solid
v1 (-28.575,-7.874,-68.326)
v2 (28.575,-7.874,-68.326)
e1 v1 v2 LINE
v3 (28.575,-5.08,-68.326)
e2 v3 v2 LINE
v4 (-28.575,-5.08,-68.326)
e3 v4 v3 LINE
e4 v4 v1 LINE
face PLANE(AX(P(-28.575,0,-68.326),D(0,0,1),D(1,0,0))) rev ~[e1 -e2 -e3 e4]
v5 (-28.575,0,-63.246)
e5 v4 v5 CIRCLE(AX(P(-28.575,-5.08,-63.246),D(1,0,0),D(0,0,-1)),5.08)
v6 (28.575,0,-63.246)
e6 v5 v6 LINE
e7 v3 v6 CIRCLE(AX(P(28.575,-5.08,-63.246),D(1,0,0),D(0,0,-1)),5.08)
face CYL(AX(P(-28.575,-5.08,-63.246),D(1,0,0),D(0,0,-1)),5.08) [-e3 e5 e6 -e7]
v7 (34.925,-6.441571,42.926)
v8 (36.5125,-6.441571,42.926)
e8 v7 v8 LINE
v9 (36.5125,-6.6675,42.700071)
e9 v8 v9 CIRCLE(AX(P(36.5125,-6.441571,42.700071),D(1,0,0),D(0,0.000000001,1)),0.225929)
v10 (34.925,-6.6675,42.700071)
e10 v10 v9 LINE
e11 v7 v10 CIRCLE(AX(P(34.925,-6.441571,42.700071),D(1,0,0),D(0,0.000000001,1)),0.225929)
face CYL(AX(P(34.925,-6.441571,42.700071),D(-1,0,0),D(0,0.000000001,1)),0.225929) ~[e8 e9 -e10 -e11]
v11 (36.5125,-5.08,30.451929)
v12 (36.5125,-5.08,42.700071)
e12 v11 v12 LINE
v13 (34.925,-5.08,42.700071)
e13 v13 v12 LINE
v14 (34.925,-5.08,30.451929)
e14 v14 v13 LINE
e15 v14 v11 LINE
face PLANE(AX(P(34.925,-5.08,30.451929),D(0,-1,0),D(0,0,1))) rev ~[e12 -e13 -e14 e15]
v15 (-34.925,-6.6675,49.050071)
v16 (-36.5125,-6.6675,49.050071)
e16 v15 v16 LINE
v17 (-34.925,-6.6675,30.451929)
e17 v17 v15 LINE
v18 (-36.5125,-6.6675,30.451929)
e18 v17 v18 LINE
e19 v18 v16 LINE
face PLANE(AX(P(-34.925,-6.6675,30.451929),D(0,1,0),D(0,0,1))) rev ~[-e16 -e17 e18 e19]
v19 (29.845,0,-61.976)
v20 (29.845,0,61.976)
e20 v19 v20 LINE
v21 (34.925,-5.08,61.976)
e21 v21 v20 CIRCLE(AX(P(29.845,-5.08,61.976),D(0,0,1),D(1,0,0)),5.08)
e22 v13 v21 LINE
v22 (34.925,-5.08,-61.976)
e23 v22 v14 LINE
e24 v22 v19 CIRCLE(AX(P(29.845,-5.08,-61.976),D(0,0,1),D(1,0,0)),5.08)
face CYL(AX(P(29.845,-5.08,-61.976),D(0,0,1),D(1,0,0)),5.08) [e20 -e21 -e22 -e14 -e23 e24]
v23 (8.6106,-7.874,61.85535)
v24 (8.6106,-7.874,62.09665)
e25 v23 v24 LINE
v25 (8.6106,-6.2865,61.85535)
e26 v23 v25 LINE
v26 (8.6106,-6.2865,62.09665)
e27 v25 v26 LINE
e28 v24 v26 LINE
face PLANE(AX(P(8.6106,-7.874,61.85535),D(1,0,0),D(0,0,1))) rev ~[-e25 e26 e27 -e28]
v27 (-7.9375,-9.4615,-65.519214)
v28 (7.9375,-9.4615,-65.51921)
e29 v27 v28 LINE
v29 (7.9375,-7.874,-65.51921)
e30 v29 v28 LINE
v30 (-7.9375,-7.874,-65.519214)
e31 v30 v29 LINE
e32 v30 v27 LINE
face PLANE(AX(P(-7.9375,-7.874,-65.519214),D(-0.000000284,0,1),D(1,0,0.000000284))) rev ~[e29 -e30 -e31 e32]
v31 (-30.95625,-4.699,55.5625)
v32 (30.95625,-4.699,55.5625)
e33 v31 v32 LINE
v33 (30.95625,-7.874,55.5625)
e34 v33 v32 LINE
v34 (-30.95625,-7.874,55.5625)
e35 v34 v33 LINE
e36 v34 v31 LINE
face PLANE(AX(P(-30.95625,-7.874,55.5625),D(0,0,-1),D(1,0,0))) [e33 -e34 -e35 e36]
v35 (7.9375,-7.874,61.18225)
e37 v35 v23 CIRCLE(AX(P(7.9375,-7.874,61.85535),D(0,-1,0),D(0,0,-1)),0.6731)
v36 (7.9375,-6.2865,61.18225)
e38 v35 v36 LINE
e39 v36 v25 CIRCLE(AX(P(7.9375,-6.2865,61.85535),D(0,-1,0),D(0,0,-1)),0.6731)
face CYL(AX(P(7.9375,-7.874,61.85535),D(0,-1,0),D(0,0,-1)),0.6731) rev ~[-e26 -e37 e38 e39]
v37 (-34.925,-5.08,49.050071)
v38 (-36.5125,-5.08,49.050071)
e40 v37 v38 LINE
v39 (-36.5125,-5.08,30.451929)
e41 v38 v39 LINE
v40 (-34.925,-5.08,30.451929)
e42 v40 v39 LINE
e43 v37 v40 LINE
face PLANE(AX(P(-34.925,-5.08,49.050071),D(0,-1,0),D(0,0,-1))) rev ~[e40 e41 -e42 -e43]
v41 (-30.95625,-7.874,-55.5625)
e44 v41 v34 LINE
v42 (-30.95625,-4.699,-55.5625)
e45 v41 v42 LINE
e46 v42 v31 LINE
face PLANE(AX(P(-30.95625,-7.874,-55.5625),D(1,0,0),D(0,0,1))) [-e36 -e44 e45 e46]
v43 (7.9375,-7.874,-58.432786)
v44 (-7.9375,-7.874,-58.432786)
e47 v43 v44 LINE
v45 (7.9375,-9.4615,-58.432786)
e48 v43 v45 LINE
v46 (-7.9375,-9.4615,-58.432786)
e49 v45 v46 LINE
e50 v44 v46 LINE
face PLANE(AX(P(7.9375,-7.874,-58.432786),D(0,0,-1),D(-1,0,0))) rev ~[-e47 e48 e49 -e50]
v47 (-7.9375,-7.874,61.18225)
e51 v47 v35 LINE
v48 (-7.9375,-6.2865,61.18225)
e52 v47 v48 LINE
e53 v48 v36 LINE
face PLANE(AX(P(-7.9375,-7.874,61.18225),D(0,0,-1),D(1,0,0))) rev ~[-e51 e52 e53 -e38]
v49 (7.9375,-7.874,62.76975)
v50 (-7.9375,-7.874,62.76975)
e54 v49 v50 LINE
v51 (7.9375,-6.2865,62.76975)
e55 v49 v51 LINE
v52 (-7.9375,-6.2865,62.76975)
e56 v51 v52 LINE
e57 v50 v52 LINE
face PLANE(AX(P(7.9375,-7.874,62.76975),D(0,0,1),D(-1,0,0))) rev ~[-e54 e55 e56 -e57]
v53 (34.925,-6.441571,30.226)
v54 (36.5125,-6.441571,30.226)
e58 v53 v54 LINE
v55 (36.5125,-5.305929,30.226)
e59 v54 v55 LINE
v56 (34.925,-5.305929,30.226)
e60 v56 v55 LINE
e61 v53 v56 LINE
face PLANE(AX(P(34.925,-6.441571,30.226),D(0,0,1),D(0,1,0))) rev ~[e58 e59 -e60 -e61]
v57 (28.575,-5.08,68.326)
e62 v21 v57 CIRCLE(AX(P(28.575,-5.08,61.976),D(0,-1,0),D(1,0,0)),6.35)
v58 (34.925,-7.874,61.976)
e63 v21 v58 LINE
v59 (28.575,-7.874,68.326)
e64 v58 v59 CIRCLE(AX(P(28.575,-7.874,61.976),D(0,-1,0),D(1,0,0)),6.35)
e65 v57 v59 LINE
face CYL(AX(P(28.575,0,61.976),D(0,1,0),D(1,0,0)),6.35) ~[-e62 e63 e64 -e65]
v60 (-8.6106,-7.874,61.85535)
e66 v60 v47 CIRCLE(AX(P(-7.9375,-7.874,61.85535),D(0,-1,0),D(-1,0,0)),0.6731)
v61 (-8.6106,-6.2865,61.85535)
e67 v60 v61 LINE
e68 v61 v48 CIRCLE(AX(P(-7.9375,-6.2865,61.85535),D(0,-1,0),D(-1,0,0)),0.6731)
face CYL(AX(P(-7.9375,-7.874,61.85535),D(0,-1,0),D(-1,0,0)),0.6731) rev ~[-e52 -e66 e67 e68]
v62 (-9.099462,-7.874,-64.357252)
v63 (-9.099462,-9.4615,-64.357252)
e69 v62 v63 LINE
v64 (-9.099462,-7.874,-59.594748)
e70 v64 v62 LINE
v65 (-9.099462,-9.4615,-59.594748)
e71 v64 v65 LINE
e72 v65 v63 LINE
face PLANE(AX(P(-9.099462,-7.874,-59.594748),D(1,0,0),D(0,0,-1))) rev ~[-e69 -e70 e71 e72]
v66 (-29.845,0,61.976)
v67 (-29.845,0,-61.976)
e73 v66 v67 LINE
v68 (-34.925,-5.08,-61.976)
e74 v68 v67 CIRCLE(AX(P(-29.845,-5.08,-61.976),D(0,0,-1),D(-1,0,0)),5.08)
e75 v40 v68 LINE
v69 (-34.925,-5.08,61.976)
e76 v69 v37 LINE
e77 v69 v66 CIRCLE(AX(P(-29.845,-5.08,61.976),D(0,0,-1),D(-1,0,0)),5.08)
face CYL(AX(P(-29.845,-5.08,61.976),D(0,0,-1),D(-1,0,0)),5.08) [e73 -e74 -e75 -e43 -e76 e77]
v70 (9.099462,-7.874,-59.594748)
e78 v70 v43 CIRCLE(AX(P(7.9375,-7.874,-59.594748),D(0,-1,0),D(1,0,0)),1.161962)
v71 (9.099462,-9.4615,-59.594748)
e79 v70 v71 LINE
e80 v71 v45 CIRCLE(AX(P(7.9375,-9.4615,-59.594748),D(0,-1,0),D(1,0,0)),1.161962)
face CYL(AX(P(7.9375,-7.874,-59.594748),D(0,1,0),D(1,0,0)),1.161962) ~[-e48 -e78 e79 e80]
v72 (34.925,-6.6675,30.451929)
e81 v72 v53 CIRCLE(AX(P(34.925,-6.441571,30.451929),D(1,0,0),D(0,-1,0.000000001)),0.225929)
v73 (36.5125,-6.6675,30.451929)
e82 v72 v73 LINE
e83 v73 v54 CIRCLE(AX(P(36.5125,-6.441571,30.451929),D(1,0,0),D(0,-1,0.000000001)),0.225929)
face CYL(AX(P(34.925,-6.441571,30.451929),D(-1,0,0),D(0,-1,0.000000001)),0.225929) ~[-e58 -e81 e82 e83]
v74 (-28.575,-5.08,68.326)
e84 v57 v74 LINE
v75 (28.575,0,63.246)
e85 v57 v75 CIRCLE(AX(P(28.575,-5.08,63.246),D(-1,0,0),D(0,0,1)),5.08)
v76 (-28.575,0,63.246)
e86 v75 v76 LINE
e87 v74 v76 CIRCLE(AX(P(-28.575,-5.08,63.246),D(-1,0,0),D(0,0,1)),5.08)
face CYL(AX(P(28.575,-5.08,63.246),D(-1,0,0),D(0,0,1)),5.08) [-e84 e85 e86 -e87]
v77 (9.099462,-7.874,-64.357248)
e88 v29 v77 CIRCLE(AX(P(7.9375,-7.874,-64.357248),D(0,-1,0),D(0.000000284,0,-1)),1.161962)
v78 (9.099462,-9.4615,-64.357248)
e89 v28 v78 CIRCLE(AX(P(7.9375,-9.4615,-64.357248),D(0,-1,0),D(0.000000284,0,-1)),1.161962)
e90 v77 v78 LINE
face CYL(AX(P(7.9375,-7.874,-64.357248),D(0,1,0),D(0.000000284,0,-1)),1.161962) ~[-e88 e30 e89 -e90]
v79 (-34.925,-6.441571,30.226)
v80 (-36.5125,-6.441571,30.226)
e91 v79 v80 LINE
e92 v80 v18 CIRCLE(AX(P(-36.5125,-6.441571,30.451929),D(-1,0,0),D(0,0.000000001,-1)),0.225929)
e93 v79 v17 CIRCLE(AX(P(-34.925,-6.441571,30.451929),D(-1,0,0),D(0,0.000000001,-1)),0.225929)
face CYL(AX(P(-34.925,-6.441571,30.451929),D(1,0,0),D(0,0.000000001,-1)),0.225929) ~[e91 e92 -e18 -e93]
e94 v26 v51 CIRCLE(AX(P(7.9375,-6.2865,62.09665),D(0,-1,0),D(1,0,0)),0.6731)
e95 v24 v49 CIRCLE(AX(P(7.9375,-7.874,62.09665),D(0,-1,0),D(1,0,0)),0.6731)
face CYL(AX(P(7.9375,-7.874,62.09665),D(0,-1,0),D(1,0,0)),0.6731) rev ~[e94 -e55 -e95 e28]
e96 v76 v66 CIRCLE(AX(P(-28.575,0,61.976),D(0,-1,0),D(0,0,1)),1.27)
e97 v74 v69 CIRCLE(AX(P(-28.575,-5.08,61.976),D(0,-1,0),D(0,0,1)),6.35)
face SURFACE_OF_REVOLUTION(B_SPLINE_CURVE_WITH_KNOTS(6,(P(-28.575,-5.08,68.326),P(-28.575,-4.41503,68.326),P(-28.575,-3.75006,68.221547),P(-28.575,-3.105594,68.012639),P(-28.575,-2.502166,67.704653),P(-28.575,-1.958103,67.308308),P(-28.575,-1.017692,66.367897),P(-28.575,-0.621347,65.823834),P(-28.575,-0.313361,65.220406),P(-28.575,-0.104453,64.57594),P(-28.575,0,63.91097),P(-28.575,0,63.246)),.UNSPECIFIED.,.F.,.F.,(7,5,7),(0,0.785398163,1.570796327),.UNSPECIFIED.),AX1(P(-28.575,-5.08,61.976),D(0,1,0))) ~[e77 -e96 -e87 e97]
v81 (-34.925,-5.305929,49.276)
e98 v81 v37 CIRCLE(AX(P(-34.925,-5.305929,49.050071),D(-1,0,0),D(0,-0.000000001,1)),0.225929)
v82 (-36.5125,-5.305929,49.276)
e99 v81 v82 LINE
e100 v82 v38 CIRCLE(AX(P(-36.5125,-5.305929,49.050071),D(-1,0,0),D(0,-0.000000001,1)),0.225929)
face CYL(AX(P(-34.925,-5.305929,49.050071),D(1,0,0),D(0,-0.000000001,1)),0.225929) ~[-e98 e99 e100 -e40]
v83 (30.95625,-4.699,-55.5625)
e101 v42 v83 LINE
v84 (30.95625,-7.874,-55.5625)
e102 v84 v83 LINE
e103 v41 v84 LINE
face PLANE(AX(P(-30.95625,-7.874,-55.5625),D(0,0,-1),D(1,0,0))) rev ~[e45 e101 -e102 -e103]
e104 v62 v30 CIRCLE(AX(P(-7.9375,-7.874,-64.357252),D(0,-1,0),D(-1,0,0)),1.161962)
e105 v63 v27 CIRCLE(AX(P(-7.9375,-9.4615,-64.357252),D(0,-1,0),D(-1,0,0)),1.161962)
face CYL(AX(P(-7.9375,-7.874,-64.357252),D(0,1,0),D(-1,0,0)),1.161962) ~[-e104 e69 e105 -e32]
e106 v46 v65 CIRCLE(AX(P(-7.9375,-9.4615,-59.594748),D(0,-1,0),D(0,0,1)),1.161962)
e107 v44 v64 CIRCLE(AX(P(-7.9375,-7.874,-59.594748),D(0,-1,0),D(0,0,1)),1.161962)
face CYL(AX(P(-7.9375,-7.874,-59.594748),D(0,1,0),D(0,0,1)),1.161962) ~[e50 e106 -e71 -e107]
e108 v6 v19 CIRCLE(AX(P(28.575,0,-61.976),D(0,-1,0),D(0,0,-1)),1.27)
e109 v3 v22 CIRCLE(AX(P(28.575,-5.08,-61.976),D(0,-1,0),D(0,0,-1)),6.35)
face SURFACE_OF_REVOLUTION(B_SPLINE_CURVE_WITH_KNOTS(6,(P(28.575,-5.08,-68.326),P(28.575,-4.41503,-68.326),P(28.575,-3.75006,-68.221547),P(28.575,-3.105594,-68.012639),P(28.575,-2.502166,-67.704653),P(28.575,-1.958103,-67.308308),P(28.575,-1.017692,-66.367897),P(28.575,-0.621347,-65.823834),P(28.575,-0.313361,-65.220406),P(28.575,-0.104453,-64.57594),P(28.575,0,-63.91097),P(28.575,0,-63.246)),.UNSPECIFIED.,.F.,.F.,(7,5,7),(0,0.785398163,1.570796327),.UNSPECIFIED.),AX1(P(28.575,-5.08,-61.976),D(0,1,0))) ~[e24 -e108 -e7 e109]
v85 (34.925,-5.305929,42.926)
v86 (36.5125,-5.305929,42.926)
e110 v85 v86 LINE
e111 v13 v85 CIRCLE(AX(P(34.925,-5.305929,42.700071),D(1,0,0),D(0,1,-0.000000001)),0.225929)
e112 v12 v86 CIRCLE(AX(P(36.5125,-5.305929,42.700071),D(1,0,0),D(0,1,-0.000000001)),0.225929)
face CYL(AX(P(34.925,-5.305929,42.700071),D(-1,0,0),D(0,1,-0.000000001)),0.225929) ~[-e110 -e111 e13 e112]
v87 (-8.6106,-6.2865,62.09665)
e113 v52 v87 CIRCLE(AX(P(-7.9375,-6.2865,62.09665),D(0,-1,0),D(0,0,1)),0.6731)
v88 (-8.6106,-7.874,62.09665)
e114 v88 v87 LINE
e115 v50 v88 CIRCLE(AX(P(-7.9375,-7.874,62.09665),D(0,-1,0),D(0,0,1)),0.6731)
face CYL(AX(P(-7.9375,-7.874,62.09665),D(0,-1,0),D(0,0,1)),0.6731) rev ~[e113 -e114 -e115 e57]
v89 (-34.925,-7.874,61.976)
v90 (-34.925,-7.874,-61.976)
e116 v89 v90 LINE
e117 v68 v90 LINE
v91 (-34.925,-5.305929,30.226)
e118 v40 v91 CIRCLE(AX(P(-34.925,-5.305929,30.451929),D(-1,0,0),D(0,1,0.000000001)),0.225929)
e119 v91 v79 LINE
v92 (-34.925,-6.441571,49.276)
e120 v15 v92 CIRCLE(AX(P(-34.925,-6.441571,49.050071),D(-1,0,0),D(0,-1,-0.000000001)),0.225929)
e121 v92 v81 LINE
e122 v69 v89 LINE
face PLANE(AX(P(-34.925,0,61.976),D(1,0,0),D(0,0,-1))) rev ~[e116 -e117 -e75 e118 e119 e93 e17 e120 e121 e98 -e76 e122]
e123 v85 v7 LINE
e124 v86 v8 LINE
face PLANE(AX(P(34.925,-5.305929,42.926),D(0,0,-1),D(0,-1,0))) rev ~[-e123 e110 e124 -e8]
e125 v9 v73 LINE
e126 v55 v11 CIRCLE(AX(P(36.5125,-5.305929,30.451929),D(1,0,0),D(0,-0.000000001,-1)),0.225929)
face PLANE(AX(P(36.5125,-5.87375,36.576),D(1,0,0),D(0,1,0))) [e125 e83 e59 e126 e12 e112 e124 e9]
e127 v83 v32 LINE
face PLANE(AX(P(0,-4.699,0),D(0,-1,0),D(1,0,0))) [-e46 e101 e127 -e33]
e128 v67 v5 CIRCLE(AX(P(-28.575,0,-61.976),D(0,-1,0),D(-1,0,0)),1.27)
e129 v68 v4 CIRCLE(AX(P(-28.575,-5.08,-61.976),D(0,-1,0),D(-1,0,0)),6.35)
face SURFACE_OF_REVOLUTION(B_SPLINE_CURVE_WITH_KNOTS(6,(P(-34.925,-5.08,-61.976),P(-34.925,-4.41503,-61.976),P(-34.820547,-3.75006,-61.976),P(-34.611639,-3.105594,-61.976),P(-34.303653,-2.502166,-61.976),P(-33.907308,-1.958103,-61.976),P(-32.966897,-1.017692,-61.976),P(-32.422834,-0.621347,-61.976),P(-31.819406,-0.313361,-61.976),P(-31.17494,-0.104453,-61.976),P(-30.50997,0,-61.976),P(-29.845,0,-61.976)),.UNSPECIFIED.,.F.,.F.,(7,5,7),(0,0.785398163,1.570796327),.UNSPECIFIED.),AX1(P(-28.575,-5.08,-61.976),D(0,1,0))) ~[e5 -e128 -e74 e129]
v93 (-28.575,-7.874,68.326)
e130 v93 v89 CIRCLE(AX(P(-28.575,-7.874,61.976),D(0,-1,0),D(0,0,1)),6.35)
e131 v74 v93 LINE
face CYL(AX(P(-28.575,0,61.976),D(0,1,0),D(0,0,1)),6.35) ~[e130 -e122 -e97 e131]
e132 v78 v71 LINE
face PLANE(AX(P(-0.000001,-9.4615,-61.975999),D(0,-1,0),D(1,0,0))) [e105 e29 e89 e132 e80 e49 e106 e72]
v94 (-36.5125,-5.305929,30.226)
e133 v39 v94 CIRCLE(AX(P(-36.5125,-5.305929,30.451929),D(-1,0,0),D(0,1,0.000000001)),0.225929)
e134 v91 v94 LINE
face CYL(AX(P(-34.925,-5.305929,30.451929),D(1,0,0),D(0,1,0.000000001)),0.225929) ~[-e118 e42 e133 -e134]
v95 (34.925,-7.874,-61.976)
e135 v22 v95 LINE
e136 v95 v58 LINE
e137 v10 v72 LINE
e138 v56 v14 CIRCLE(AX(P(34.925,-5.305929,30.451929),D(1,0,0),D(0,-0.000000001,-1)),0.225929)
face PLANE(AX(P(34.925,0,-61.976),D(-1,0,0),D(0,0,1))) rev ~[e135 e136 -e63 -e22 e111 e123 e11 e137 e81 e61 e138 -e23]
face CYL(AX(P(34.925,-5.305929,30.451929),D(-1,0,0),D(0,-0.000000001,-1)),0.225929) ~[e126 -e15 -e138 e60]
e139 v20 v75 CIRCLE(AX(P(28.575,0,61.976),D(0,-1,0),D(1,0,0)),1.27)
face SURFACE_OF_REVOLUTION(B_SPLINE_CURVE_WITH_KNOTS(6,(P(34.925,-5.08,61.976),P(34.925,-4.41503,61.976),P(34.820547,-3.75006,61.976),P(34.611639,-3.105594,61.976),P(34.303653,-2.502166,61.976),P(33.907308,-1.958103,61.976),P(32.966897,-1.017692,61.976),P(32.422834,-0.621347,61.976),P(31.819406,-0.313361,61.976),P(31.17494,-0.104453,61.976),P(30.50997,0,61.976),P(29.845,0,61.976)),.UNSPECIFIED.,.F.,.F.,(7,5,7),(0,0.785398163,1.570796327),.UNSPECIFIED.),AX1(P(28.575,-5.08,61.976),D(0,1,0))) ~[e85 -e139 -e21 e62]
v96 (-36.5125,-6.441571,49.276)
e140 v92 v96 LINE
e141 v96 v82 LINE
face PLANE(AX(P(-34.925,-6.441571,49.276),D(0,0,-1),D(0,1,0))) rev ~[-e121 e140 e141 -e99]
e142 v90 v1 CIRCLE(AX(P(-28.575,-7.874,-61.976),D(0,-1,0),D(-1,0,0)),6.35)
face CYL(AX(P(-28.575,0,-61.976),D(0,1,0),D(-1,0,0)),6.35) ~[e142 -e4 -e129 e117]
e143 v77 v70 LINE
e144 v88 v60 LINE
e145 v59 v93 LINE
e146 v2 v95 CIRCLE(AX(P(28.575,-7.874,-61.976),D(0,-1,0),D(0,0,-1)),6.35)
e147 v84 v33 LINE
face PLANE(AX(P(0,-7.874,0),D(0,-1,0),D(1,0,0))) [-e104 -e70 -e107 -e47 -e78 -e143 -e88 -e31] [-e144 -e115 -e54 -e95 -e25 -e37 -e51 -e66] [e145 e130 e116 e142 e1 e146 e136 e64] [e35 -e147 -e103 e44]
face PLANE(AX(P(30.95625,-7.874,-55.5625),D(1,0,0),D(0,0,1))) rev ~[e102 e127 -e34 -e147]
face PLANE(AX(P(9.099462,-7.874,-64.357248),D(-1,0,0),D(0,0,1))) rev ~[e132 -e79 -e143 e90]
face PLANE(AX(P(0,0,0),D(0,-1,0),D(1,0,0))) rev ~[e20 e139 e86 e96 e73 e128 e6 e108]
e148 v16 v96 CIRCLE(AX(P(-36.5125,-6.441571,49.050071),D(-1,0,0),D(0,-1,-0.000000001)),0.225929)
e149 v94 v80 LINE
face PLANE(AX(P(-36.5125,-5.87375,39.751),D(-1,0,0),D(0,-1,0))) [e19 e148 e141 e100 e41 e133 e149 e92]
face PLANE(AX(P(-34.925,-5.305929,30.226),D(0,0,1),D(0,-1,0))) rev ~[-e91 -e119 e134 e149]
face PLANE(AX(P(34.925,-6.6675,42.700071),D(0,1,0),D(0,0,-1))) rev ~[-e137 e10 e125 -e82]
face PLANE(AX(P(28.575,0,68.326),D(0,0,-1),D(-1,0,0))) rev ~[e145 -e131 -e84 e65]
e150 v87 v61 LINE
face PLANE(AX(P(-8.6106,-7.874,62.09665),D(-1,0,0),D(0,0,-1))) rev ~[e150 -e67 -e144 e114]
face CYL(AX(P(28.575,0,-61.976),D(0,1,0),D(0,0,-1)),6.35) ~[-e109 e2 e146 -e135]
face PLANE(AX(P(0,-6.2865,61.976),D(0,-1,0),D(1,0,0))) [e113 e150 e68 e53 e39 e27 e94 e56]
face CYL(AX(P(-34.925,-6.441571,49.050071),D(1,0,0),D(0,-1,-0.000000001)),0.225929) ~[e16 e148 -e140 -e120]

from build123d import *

# Parameters (mm, degrees)
F1_DEPTH  = 7.874
F2_R      = 5.08
F3_W      = 61.9125
F3_H      = 111.125
F4_DEPTH  = 3.175
F6_DEPTH  = 1.5875
F7_DEPTH  = 1.5875
F9_DEPTH  = 1.5875
F11_DEPTH = 1.5875


# Not quite as in the source:
# - a length typed as a fraction of an inch, garbled in the dataset ("3 / 203.2 mm" for 3/8 in), is restored
# - a feature names something its author has since deleted; it is built from what else it names


with BuildPart() as f1:
    # F0 (on Front) → F1 (new body)
    with BuildSketch(Plane.XZ):
        with BuildLine():
            ThreePointArc((-28.575, 68.326), (-33.0651280605, 66.4661280605), (-34.925, 61.976))
            Line((-34.925, 61.976), (-34.925, -61.976))
            ThreePointArc((-34.925, -61.976), (-33.0651280605, -66.4661280605), (-28.575, -68.326))
            Line((-28.575, -68.326), (28.575, -68.326))
            ThreePointArc((28.575, -68.326), (33.0651280605, -66.4661280605), (34.925, -61.976))
            Line((34.925, -61.976), (34.925, 61.976))
            ThreePointArc((34.925, 61.976), (33.0651280605, 66.4661280605), (28.575, 68.326))
            Line((28.575, 68.326), (-28.575, 68.326))
        make_face()
    extrude(amount=F1_DEPTH)

    # F2
    f2_edges = [f1.edges().sort_by_distance(p)[0] for p in [
        (33.065128, 0, 66.466128),
        (0, 0, 68.326),
        (34.925, 0, 0),
    ]]
    fillet(f2_edges, radius=F2_R)

    # F3 (on face) → F4 (cut)
    with BuildSketch(Plane.XZ.offset(7.874)):
        Rectangle(F3_W, F3_H)
    extrude(amount=-F4_DEPTH, mode=Mode.SUBTRACT)

    # F5 (on face) → F6 (join)
    with BuildSketch(Plane.XZ.offset(7.874)):
        with BuildLine():
            Line((7.9375, -58.4327856867), (-7.9375, -58.4327856867))
            ThreePointArc((-7.9375, -58.4327856867), (-8.7591312506, -58.7731164939), (-9.0994620578, -59.5947477445))
            Line((-9.0994620578, -59.5947477445), (-9.0994620578, -64.3572522555))
            ThreePointArc((-9.0994620578, -64.3572522555), (-8.7591311338, -65.1788836228), (-7.9374996698, -65.5192143133))
            Line((-7.9374996698, -65.5192143133), (7.9375003302, -65.5192098023))
            ThreePointArc((7.9375003302, -65.5192098023), (8.7591313673, -65.1788788783), (9.0994620578, -64.3572477445))
            Line((9.0994620578, -64.3572477445), (9.0994620578, -59.5947477445))
            ThreePointArc((9.0994620578, -59.5947477445), (8.7591312506, -58.7731164939), (7.9375, -58.4327856867))
        make_face()
    extrude(amount=F6_DEPTH)

    # F3 (on face) → F7 (cut)
    with BuildSketch(Plane.XZ.offset(7.874)):
        with BuildLine():
            Line((7.9375, 62.76975), (-7.9375, 62.76975))
            ThreePointArc((-7.9375, 62.76975), (-8.4134535744, 62.5726035744), (-8.6106, 62.09665))
            Line((-8.6106, 62.09665), (-8.6106, 61.85535))
            ThreePointArc((-8.6106, 61.85535), (-8.4134535744, 61.3793964256), (-7.9375, 61.18225))
            Line((-7.9375, 61.18225), (7.9375, 61.18225))
            ThreePointArc((7.9375, 61.18225), (8.4134535744, 61.3793964256), (8.6106, 61.85535))
            Line((8.6106, 61.85535), (8.6106, 62.09665))
            ThreePointArc((8.6106, 62.09665), (8.4134535744, 62.5726035744), (7.9375, 62.76975))
        make_face()
    extrude(amount=-F7_DEPTH, mode=Mode.SUBTRACT)

    # F8 (on face) → F9 (join)
    with BuildSketch(Plane(origin=(-34.925, 0, 0), x_dir=(0, -1, 0), z_dir=(-1, 0, 0))):
        with BuildLine():
            Line((6.6675, 30.4519287544), (6.6675, 49.0500712456))
            ThreePointArc((6.6675, 49.0500712456), (6.601327, 49.209827), (6.4415712456, 49.276))
            Line((6.4415712456, 49.276), (5.3059287544, 49.276))
            ThreePointArc((5.3059287544, 49.276), (5.146173, 49.209827), (5.08, 49.0500712456))
            Line((5.08, 49.0500712456), (5.08, 30.4519287544))
            ThreePointArc((5.08, 30.4519287544), (5.146173, 30.292173), (5.3059287544, 30.226))
            Line((5.3059287544, 30.226), (6.4415712456, 30.226))
            ThreePointArc((6.4415712456, 30.226), (6.601327, 30.292173), (6.6675, 30.4519287544))
        make_face()
    extrude(amount=F9_DEPTH)

    # F10 (on face) → F11 (join)
    with BuildSketch(Plane.YZ.offset(34.925)):
        with BuildLine():
            Line((-5.08, 30.4519287544), (-5.08, 42.7000712456))
            ThreePointArc((-5.08, 42.7000712456), (-5.146173, 42.859827), (-5.3059287544, 42.926))
            Line((-5.3059287544, 42.926), (-6.4415712456, 42.926))
            ThreePointArc((-6.4415712456, 42.926), (-6.601327, 42.859827), (-6.6675, 42.7000712456))
            Line((-6.6675, 42.7000712456), (-6.6675, 30.4519287544))
            ThreePointArc((-6.6675, 30.4519287544), (-6.601327, 30.292173), (-6.4415712456, 30.226))
            Line((-6.4415712456, 30.226), (-5.3059287544, 30.226))
            ThreePointArc((-5.3059287544, 30.226), (-5.146173, 30.292173), (-5.08, 30.4519287544))
        make_face()
    extrude(amount=F11_DEPTH)


solid = f1.part
